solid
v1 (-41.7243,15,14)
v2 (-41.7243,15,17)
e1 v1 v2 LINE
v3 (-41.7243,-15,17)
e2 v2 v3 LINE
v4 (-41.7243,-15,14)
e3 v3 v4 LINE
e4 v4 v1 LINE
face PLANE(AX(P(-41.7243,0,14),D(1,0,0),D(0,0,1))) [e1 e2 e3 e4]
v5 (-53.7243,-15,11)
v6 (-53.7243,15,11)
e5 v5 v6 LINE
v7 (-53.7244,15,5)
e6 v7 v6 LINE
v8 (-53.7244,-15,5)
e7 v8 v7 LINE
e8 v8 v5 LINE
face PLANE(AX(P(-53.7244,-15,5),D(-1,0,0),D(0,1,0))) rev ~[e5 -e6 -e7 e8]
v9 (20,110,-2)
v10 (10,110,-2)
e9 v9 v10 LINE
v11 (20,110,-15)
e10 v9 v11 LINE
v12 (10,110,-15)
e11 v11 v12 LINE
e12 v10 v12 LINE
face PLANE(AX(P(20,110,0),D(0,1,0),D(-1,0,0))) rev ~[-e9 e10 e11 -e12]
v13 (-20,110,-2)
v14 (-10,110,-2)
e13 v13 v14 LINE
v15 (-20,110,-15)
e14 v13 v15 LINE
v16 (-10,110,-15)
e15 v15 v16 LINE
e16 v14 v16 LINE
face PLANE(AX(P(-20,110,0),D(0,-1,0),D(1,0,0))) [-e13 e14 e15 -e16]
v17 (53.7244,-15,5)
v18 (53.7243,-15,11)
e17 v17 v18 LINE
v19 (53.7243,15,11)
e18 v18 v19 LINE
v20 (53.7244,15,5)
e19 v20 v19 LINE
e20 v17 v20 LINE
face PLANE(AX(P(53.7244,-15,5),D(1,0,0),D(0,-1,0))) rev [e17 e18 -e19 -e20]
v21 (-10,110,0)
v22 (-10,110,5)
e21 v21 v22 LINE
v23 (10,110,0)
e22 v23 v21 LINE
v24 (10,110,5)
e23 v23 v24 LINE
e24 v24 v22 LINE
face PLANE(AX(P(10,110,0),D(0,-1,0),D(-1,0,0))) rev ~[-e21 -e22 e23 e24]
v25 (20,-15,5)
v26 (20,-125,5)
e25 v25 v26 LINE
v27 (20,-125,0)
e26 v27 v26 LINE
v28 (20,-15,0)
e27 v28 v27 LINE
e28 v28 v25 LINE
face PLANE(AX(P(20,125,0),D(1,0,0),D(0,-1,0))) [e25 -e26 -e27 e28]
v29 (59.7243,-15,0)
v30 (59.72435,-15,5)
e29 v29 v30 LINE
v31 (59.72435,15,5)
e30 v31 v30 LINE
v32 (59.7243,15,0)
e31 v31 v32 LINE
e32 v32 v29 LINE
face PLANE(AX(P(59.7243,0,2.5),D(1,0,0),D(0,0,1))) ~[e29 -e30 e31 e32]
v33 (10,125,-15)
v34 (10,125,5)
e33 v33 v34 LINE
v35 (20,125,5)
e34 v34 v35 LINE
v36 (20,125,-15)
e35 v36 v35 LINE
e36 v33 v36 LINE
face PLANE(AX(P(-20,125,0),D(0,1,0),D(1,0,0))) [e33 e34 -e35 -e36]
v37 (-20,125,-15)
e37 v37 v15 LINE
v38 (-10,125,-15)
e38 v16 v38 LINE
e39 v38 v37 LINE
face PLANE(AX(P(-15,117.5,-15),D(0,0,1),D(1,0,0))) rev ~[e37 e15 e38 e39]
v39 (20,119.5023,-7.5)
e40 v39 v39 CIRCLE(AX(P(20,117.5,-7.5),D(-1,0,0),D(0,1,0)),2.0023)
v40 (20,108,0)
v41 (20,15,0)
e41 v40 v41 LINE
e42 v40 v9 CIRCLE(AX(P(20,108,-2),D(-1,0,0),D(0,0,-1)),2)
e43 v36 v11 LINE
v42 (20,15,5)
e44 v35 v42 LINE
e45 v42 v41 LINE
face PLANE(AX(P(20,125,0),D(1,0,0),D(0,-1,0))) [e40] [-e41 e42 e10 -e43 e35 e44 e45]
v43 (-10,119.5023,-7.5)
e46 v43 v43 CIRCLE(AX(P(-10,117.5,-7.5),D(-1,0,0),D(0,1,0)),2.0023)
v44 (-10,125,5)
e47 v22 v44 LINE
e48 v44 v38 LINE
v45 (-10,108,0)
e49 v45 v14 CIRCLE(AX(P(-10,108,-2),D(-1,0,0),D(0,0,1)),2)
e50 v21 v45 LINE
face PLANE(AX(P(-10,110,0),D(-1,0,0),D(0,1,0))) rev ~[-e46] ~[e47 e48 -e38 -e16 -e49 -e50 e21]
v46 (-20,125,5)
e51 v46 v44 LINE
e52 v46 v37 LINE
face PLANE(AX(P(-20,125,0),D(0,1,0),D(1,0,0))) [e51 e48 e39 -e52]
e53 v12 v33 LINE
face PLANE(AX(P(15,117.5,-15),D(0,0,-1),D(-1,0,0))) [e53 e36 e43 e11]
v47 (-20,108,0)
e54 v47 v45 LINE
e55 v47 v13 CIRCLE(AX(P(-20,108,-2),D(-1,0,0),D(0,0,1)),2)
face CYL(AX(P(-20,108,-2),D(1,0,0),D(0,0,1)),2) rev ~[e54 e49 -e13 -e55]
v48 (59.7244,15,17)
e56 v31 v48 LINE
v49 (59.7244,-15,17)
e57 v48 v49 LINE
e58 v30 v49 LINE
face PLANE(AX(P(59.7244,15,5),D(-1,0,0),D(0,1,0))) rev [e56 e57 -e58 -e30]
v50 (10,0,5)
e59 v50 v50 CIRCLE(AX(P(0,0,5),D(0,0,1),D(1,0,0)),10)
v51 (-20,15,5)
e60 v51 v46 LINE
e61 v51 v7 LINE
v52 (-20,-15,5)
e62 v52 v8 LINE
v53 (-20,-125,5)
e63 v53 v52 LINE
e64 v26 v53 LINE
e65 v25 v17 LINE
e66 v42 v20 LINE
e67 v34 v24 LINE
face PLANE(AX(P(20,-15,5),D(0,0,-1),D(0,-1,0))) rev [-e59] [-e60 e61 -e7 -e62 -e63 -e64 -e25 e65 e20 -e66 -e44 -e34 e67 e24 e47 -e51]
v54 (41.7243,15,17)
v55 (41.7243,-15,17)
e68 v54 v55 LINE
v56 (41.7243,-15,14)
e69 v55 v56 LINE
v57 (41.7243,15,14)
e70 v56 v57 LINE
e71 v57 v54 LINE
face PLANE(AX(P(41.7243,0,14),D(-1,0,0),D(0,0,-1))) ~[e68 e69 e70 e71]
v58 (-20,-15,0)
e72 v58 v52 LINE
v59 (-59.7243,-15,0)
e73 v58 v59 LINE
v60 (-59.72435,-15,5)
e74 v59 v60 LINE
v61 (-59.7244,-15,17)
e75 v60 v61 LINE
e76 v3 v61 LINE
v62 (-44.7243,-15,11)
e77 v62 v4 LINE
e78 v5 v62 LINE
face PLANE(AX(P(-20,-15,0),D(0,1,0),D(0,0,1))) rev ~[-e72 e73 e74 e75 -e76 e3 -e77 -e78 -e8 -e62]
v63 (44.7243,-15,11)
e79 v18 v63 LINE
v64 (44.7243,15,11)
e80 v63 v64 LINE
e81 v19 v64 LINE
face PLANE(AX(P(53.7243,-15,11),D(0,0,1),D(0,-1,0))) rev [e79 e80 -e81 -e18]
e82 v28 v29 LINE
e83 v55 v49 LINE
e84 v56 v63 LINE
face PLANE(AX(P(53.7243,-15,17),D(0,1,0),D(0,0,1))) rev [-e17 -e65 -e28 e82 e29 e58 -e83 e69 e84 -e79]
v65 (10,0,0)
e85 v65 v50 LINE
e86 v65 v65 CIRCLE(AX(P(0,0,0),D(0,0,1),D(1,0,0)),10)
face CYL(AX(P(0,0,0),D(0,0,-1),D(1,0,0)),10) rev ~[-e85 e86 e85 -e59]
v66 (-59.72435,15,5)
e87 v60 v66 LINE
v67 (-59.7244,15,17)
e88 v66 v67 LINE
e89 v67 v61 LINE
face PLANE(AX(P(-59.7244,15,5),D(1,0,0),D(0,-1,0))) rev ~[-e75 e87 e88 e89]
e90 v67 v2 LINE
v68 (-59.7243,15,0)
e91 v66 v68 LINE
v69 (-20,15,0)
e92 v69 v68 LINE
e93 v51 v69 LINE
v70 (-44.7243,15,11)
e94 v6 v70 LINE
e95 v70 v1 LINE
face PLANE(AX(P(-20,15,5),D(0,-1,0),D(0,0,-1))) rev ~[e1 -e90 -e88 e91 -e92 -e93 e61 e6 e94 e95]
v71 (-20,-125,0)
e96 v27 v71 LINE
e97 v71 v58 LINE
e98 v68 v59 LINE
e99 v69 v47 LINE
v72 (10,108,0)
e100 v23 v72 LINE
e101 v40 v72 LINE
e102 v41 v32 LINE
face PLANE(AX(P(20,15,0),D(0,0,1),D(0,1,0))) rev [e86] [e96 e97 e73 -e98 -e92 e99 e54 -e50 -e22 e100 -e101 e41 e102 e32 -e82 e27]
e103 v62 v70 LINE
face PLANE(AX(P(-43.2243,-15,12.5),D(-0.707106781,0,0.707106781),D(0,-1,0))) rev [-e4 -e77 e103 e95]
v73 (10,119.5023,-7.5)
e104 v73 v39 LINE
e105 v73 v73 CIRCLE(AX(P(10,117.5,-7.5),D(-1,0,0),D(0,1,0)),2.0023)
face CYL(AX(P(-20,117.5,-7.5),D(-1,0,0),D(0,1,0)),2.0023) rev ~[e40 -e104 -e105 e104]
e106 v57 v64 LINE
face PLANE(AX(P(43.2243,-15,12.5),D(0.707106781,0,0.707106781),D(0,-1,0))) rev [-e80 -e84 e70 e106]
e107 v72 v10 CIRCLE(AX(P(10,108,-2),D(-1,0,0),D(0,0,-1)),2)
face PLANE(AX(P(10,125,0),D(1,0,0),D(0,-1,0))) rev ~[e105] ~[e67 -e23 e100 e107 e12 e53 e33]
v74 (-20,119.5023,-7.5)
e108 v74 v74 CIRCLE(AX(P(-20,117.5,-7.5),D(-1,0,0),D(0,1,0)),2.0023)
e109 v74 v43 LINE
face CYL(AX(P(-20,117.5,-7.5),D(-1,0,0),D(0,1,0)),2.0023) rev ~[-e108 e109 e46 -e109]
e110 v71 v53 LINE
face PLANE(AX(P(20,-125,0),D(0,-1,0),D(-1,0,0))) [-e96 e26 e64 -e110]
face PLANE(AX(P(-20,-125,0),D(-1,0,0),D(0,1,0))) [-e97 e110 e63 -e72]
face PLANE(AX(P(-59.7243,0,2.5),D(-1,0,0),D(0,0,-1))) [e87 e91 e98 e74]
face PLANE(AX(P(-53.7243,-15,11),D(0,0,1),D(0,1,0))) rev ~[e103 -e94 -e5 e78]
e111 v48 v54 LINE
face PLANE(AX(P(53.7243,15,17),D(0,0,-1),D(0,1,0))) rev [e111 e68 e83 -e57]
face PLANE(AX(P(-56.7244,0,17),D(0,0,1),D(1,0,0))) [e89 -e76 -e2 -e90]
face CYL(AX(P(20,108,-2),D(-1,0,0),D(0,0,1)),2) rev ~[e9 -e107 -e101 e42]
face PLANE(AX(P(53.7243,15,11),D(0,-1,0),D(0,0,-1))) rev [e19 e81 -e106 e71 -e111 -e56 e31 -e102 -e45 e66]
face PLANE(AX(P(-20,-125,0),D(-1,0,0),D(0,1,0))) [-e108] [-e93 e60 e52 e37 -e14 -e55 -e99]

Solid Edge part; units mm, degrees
sketch "Sketch1" plane through (0, 0, 0) normal (0, 0, 1) x (1, 0, 0)
  line L0 (20, -125) -> (-20, -125)
  line L1 (-20, -125) -> (-20, 125)
  line L2 (-20, 125) -> (20, 125)
  line L3 (20, 125) -> (20, -125)
  circle A0 centre (0, 0) radius 10
  dimension "D1" = 250
  dimension "D2" = 40
  dimension "D3" = 20
extrude "Ajout_matière_1" add sketch "Sketch1" along normal blind 5
sketch "Sketch2" plane through (0, 0, 0) normal (0, 0, -1) x (0, 1, 0)
  line L0 (125, 10) -> (110, 10)
  line L1 (110, 10) -> (110, -10)
  line L2 (110, -10) -> (125, -10)
  line L3 (125, -10) -> (125, 10)
  dimension "D1" = 20
  dimension "D2" = 15
extrude "Enlèvement_matière_1" cut sketch "Sketch2" against normal blind 34.8434
sketch "Sketch3" plane through (0, 0, 0) normal (0, 0, -1) x (0, 1, 0)
  line L0 (125, -20) -> (110, -20)
  line L1 (110, -20) -> (110, -10)
  line L2 (110, -10) -> (125, -10)
  line L3 (125, -10) -> (125, -20)
  line L4 (125, 20) -> (110, 20)
  line L5 (110, 20) -> (110, 10)
  line L6 (110, 10) -> (125, 10)
  line L7 (125, 10) -> (125, 20)
extrude "Ajout_matière_2" add sketch "Sketch3" along normal blind 15
sketch "Sketch4" plane through (-20, 0, -5) normal (-1, 0, 0) x (0, 1, 0)
  circle A0 centre (117.5, 2.5) radius 2.0023
  dimension "D1" = 7.5
  dimension "D2" = 4.0046
extrude "Enlèvement_matière_2" cut sketch "Sketch4" against normal blind 63.2944
fillet "Congé_1" radius 2 2 edges at (15, 110, 0) (-15, 110, 0)
sketch "Sketch5" plane through (-20, 0, -5) normal (-1, 0, 0) x (0, 1, 0)
  line L0 (-15, -10) -> (15, -10)
  line L1 (15, -10) -> (15, -5)
  line L2 (15, -5) -> (-15, -5)
  line L3 (-15, -5) -> (-15, -10)
  dimension "D1" = 30
extrude "Protrusion1" add sketch "Sketch5" along normal blind 39.7243
sketch "Sketch6" plane through (-19.8622, 0, 5) normal (0, 0, 1) x (0, -1, 0)
  line L0 (-15, -39.8622) -> (15, -39.8622)
  line L1 (15, -39.8622) -> (15, -33.8622)
  line L2 (15, -33.8622) -> (-15, -33.8622)
  line L3 (-15, -33.8622) -> (-15, -39.8622)
  dimension "D1" = 6
extrude "Ajout_matière_4" add sketch "Sketch6" along normal blind 12
sketch "Sketch7" plane through (-53.7243, 0, 11) normal (1, 0, 0) x (0, -1, 0)
  line L0 (-15, -6) -> (15, -6)
  line L1 (15, -6) -> (15, 0)
  line L2 (15, 0) -> (-15, 0)
  line L3 (-15, 0) -> (-15, -6)
extrude "Ajout_matière_7" add sketch "Sketch7" along normal blind 12
mirror "Mirror1" about plane through (0, 0, 0) normal (1, 0, 0) of "Ajout_matière_7", "Ajout_matière_4", "Protrusion1"
chamfer "Chanfrein_1" distance 3 angle 45 2 edges at (-41.7243, 0, 11) (41.7243, 0, 11)
properties material "Acier S235"
